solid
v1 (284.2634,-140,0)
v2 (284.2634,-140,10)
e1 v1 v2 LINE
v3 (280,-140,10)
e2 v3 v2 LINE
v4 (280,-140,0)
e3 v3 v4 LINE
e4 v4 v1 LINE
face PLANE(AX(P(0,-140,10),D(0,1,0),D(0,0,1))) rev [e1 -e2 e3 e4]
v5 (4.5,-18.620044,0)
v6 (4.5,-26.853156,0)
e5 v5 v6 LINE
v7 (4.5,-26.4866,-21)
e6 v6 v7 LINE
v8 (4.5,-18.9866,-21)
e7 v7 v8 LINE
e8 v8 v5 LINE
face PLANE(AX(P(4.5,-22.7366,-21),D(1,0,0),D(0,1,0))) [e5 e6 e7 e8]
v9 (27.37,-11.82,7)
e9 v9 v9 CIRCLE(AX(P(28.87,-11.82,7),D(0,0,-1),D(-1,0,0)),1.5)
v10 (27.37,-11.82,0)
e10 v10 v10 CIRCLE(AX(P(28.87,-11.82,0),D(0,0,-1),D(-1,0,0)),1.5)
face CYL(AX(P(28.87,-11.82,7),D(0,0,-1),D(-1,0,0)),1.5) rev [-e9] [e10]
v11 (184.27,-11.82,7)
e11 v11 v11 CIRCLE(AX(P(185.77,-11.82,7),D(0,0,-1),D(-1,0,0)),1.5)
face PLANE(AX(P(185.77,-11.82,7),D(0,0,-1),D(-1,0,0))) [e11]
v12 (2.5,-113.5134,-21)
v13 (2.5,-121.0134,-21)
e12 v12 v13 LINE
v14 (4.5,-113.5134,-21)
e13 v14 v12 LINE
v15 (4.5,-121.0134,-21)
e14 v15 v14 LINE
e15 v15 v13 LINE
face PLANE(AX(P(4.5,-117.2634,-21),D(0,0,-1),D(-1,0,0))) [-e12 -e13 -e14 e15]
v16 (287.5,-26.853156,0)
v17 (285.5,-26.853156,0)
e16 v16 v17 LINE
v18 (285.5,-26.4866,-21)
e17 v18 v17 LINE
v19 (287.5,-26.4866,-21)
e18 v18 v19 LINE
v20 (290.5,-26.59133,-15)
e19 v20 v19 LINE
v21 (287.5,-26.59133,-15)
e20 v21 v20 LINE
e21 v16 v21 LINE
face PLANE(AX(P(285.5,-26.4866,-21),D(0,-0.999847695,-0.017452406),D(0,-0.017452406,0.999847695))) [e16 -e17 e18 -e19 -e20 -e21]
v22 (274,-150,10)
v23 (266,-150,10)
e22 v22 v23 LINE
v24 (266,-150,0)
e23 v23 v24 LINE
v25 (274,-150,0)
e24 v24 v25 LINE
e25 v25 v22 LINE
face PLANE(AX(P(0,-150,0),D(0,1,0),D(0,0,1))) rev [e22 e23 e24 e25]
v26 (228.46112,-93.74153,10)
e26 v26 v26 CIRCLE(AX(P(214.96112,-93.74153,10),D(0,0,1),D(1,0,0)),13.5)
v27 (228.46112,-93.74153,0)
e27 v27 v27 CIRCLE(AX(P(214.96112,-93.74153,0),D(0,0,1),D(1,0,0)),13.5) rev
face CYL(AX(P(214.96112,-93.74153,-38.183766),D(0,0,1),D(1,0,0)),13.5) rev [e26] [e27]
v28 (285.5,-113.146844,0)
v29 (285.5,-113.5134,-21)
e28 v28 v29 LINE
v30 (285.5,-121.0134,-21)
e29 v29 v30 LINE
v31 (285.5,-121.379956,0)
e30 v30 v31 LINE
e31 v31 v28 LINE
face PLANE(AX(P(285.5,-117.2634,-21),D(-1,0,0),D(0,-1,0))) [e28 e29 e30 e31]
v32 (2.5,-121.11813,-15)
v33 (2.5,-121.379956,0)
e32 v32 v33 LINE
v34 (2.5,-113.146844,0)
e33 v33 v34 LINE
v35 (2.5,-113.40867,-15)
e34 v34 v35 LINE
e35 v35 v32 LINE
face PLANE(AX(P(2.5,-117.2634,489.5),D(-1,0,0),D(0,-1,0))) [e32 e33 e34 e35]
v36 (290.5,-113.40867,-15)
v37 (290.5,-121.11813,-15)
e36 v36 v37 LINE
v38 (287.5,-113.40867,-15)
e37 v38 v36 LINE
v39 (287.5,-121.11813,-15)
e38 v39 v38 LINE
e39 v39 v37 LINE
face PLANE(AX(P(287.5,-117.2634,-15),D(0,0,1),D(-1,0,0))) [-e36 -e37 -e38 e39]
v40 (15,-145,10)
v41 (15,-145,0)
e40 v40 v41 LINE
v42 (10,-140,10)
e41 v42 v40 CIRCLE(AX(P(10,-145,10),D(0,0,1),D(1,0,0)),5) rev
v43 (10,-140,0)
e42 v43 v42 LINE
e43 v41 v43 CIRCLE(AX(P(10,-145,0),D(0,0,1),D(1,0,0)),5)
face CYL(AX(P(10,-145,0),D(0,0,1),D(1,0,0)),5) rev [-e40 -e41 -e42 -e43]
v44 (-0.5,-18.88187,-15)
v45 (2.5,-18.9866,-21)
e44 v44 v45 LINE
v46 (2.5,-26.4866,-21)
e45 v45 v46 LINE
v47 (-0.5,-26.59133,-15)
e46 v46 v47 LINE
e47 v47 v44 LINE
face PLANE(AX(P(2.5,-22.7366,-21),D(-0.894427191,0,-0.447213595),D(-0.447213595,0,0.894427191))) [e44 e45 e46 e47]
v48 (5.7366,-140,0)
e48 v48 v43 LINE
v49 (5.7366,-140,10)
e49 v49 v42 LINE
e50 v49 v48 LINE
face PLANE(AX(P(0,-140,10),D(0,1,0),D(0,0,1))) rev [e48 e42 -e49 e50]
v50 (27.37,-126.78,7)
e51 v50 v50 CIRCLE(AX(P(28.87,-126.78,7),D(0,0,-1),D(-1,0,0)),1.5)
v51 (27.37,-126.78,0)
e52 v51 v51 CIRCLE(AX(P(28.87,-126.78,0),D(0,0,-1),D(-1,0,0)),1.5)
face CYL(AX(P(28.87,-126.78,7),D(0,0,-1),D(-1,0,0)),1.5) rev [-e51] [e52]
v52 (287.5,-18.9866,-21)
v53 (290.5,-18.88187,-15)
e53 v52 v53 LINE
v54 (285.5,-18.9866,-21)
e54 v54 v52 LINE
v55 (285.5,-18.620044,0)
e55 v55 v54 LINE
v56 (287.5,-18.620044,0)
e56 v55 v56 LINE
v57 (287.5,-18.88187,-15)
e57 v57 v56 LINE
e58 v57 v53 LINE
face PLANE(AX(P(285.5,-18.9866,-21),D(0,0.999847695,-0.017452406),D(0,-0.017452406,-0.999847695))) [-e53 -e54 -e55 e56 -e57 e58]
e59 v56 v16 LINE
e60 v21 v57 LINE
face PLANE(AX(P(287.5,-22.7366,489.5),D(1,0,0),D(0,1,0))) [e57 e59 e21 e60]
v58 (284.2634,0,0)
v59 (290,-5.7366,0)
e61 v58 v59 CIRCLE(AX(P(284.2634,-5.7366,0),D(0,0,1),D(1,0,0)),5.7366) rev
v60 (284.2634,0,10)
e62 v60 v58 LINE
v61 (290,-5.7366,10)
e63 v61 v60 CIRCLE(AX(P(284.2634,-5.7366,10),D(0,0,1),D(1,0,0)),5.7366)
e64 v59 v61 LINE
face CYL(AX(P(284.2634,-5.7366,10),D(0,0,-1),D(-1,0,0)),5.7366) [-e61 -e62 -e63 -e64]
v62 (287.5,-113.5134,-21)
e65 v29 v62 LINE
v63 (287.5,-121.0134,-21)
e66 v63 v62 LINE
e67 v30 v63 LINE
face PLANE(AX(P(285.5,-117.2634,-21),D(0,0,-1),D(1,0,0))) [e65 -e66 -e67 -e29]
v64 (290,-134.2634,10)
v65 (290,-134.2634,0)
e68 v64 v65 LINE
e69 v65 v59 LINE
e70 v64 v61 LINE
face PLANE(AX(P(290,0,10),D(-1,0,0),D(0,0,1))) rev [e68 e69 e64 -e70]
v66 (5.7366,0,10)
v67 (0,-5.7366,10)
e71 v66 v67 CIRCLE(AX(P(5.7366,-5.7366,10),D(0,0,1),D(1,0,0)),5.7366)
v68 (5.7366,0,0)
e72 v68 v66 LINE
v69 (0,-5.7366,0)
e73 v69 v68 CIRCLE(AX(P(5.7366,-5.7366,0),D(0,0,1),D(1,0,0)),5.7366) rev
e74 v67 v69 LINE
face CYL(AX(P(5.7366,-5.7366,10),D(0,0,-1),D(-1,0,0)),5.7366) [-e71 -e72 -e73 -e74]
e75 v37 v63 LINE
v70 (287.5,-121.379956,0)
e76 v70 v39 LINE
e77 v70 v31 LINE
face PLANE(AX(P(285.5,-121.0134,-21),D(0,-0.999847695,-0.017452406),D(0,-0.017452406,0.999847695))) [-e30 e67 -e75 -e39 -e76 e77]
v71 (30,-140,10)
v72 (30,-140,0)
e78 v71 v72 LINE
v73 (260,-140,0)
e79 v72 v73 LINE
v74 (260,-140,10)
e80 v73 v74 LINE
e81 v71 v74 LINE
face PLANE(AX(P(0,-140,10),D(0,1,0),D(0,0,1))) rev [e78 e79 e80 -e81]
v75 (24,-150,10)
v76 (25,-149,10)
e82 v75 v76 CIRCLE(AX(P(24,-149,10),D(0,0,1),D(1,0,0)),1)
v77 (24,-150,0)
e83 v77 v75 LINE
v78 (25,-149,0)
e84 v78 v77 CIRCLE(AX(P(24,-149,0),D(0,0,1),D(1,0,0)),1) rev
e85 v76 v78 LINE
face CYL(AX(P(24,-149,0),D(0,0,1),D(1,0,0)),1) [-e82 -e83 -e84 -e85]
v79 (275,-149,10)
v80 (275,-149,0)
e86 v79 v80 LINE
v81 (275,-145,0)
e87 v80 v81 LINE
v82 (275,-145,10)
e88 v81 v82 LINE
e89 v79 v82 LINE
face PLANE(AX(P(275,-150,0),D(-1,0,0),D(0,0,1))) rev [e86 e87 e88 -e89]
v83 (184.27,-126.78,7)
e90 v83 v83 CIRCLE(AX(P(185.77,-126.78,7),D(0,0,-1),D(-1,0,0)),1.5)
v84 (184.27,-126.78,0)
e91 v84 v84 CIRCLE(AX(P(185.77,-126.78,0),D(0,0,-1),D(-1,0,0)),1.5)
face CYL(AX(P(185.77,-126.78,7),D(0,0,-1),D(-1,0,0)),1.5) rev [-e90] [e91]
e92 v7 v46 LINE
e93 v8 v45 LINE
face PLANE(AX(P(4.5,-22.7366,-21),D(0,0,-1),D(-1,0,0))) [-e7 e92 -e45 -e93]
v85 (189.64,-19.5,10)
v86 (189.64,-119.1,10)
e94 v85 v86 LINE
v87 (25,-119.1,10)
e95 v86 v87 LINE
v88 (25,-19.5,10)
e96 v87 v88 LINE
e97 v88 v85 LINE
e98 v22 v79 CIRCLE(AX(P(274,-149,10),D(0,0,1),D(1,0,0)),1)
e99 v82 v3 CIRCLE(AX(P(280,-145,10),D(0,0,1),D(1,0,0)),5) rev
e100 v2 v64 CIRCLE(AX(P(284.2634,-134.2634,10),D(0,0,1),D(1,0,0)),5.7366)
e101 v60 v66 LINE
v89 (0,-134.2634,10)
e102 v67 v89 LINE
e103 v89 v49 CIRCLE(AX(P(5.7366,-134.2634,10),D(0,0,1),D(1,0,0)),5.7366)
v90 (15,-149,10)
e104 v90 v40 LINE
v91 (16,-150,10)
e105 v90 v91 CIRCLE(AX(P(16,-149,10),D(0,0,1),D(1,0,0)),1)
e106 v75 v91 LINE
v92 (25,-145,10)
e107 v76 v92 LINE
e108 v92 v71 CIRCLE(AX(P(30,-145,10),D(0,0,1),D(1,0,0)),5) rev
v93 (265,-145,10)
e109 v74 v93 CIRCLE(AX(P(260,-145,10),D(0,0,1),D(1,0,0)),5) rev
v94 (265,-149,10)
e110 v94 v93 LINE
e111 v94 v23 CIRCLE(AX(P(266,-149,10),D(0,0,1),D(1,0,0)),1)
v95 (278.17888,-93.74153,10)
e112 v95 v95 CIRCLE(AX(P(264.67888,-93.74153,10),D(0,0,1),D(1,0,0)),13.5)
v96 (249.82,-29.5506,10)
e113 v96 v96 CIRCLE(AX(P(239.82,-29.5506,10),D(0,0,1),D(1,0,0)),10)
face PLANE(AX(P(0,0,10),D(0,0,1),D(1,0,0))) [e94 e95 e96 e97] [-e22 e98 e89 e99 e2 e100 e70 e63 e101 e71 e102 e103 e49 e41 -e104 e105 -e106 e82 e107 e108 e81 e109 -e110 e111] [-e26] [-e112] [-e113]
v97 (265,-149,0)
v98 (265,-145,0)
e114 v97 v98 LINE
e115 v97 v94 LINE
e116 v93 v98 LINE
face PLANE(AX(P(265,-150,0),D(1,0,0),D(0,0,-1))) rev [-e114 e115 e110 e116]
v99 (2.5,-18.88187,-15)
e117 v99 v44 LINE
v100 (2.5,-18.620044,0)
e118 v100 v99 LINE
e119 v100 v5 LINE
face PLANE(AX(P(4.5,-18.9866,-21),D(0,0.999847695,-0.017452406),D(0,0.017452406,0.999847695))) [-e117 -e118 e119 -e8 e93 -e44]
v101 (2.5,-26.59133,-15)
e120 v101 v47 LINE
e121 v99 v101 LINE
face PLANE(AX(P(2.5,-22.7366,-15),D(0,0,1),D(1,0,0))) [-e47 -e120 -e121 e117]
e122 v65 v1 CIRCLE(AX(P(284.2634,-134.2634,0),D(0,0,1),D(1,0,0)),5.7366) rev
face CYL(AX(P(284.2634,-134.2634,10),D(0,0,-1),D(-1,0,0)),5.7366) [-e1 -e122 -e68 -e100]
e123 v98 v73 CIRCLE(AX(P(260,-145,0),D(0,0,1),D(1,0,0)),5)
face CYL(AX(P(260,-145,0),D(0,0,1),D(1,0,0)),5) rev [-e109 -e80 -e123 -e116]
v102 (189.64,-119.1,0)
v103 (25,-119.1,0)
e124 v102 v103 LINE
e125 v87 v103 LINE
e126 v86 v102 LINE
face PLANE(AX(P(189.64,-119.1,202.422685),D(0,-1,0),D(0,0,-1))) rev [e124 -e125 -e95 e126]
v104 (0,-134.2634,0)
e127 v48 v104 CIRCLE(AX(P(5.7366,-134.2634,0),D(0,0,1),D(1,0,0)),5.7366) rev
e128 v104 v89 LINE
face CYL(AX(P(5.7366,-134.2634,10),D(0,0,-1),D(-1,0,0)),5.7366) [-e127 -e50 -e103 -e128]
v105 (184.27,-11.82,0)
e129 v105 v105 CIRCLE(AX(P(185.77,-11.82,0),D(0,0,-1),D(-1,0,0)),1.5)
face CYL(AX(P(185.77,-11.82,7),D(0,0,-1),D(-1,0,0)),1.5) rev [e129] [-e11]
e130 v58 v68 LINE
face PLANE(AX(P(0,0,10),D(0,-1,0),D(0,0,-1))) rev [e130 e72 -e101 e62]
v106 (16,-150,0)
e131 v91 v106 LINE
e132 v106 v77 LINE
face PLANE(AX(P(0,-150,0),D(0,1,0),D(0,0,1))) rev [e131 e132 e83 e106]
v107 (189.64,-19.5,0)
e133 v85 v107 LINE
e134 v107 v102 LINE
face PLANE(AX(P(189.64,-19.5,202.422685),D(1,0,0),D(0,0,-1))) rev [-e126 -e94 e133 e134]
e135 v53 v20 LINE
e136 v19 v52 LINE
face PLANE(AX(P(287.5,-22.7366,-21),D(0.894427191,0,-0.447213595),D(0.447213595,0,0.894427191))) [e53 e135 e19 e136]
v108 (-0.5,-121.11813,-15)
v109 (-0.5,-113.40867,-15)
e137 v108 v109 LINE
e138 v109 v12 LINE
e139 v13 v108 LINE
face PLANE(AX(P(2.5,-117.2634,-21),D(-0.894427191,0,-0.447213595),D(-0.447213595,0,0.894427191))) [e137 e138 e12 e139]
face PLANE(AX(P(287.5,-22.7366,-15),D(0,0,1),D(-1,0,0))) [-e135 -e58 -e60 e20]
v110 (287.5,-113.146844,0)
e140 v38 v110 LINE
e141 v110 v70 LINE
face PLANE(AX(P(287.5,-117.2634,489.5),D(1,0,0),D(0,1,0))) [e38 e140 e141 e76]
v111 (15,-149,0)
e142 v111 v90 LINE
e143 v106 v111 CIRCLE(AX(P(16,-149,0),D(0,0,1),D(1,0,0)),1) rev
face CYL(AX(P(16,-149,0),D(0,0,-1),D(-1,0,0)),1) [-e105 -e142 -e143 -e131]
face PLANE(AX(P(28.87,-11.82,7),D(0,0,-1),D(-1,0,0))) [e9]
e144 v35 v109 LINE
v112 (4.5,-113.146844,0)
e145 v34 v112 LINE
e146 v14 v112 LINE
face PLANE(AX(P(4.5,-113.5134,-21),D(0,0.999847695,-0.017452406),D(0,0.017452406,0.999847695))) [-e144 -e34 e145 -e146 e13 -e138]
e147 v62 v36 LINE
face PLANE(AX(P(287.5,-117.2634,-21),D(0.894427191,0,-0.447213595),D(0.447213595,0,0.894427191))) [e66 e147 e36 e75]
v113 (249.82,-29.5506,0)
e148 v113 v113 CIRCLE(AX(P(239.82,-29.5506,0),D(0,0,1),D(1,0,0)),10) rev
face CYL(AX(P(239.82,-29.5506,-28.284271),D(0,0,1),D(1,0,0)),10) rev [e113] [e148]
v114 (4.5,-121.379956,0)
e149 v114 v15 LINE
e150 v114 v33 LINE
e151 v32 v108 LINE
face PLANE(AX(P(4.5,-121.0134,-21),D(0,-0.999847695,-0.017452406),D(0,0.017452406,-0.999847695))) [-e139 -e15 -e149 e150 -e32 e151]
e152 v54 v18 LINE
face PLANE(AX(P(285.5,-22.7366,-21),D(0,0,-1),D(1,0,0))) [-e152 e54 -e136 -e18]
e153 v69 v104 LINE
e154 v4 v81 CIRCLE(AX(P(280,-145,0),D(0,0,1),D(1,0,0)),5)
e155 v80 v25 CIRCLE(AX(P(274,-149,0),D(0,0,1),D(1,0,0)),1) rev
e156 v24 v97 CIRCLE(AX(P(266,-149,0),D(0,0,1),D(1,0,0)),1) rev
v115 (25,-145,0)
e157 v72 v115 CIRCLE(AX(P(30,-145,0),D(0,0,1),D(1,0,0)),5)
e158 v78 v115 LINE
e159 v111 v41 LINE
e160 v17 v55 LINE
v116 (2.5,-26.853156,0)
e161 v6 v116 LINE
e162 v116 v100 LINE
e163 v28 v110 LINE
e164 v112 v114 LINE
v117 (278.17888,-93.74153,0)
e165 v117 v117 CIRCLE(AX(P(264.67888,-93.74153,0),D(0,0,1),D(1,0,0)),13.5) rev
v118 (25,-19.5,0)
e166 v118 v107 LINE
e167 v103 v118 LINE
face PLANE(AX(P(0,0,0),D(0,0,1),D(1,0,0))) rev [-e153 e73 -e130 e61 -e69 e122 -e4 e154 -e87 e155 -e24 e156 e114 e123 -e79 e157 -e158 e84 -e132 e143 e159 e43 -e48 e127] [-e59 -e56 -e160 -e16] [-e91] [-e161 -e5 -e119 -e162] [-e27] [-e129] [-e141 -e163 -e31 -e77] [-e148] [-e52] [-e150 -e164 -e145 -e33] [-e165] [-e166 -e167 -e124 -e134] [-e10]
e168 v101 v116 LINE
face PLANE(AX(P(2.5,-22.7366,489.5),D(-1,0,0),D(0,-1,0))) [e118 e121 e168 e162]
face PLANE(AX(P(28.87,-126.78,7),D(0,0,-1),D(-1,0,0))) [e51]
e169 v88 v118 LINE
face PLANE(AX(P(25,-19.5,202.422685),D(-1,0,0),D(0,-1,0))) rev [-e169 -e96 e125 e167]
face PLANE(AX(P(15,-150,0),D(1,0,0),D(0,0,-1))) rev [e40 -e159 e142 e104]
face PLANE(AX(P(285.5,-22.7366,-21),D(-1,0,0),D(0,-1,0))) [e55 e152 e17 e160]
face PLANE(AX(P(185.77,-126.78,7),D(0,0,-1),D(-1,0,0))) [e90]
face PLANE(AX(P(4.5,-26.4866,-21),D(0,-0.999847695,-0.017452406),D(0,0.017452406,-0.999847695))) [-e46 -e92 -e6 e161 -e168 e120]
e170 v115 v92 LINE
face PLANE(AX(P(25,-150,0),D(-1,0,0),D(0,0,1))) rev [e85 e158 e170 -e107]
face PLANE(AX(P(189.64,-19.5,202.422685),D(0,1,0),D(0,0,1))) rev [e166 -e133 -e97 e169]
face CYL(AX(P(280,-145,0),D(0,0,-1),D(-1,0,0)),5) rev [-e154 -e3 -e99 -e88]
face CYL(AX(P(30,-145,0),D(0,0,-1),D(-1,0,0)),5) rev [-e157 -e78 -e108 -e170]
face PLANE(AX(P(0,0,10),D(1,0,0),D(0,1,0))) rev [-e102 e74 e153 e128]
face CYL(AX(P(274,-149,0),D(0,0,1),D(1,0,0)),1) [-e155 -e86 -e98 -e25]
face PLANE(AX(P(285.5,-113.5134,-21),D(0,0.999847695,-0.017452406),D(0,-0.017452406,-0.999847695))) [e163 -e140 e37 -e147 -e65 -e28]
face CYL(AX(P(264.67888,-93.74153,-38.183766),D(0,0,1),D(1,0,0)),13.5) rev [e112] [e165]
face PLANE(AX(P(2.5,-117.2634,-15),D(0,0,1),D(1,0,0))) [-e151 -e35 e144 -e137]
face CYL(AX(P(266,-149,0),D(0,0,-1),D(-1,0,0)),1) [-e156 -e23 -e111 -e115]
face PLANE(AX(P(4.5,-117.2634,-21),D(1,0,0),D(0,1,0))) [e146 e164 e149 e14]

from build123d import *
from OCP.BRepFilletAPI import BRepFilletAPI_MakeFillet

# Parameters (mm, degrees)
SKETCH1_W            = 290
SKETCH1_H            = 140
MAIN_BODY_DEPTH      = 10
SKETCH2_W            = 164.64
SKETCH2_H            = 99.6
DISPLAY_DEPTH        = 10
SKETCH5_W            = 10
SKETCH5_H            = 10
FEET_DEPTH           = 10
FEET_FILLETS_R1      = 5
FEET_FILLETS_R2      = 1
SKETCH8_R            = 10
ROTARY_ENCODER_DEPTH = 10
SKETCH9_R            = 13.5
CONNECTORS_DEPTH     = 10
SNAP_START           = 285.5
SNAP_HOOK1_DEPTH     = 2
SNAP_START_2         = -26.59133039
SNAP_HOOK1_2_DEPTH   = 7.70946078
SNAP_START_3         = 287.5
SNAP_HOOK1_3_DEPTH   = 3.5
SNAP_HOOK2_DEPTH     = 2
SNAP_START_4         = -121.11813039
SNAP_HOOK2_2_DEPTH   = 7.70946078
SNAP_HOOK2_3_DEPTH   = 3.5
SNAP_START_5         = 2.5
SNAP_HOOK3_DEPTH     = 2
SNAP_HOOK3_2_DEPTH   = 7.70946078
SNAP_START_6         = -1
SNAP_HOOK3_3_DEPTH   = 3.5
SNAP_HOOK4_DEPTH     = 2
SNAP_HOOK4_2_DEPTH   = 7.70946078
SNAP_HOOK4_3_DEPTH   = 3.5
SIDE_FILLETS_R       = 5.7366
SKETCH11_R           = 1.5
DISPLAY_HOLES_DEPTH  = 7


with BuildPart() as part:
    # Sketch1 → Main Body (new body)
    with BuildSketch(Plane.XY):
        with Locations((145, -70)):
            Rectangle(SKETCH1_W, SKETCH1_H)
    extrude(amount=MAIN_BODY_DEPTH)

    # Sketch2 → Display (cut)
    with BuildSketch(Plane(origin=(0, 0, 0), x_dir=(-1, 0, 0), z_dir=(0, 0, -1))):
        with Locations((-107.32, -69.3)):
            Rectangle(SKETCH2_W, SKETCH2_H)
    extrude(amount=-DISPLAY_DEPTH, mode=Mode.SUBTRACT)

    # Sketch5 → Feet (add)
    with BuildSketch(Plane.XZ.offset(140)):
        with Locations((20, 5)):
            Rectangle(SKETCH5_W, SKETCH5_H)
        with Locations((270, 5)):
            Rectangle(SKETCH5_W, SKETCH5_H)
    extrude(amount=FEET_DEPTH)

    # Feet Fillets: one fillet with a radius per group of edges: ONE call of the kernel's fillet builder (fillet() takes one radius for all edges)
    feet_fillets_edges_1 = [part.edges().sort_by_distance(p)[0] for p in [
        (15, -140, 5),
        (25, -140, 5),
        (275, -140, 5),
        (265, -140, 5),
    ]]
    feet_fillets_edges_2 = [part.edges().sort_by_distance(p)[0] for p in [
        (265, -150, 5),
        (275, -150, 5),
        (25, -150, 5),
        (15, -150, 5),
    ]]
    feet_fillets = BRepFilletAPI_MakeFillet(part.part.solid().wrapped)
    for e in feet_fillets_edges_1:
        feet_fillets.Add(FEET_FILLETS_R1, e.wrapped)
    for e in feet_fillets_edges_2:
        feet_fillets.Add(FEET_FILLETS_R2, e.wrapped)
    add(Compound.cast(feet_fillets.Shape()), mode=Mode.REPLACE)

    # Sketch8 → Rotary Encoder (cut)
    with BuildSketch(Plane.XY.offset(10)):
        with Locations((239.82, -29.550599566)):
            Circle(SKETCH8_R)
    extrude(amount=-ROTARY_ENCODER_DEPTH, mode=Mode.SUBTRACT)

    # Sketch9 → Connectors (cut)
    with BuildSketch(Plane.XY.offset(10)):
        with Locations((214.961120299, -93.741529743)):
            Circle(SKETCH9_R)
        with Locations((264.678879701, -93.741529743)):
            Circle(SKETCH9_R)
    extrude(amount=-CONNECTORS_DEPTH, mode=Mode.SUBTRACT)

    # Snap Hook1: read off the stored shape, not the designer's step
    # Snap Hook1 outline → Snap Hook1 (add)
    with BuildSketch(Plane.YZ.offset(SNAP_START)):
        Polygon((-26.4866, -21), (-18.9866, -21), (-18.620043637, 0), (-26.853156363, 0), align=None)
    extrude(amount=SNAP_HOOK1_DEPTH)

    # Snap Hook1 2 outline → Snap Hook1 2 (add)
    with BuildSketch(Plane(origin=(0, 0, 0), x_dir=(1, 0, 0), z_dir=(0, 1, 0)).offset(SNAP_START_2)):
        Polygon((287.5, 15), (290.5, 15), (287.5, 21), align=None)
    extrude(amount=SNAP_HOOK1_2_DEPTH)

    # Snap Hook1 3 outline → Snap Hook1 3 (cut)
    with BuildSketch(Plane.YZ.offset(SNAP_START_3)):
        Polygon((-18.881869611, -15), (-18.9866, -21), (-19.004055065, -22), (-18.88186961, -22), align=None)
        Polygon((-26.59133039, -22), (-26.469144935, -22), (-26.4866, -21), (-26.591330389, -15), align=None)
    extrude(amount=SNAP_HOOK1_3_DEPTH, mode=Mode.SUBTRACT)

    # Snap Hook2: read off the stored shape, not the designer's step
    # Snap Hook2 outline → Snap Hook2 (add)
    with BuildSketch(Plane.YZ.offset(SNAP_START)):
        Polygon((-121.0134, -21), (-113.5134, -21), (-113.146843637, 0), (-121.379956363, 0), align=None)
    extrude(amount=SNAP_HOOK2_DEPTH)

    # Snap Hook2 2 outline → Snap Hook2 2 (add)
    with BuildSketch(Plane(origin=(0, 0, 0), x_dir=(1, 0, 0), z_dir=(0, 1, 0)).offset(SNAP_START_4)):
        Polygon((287.5, 15), (290.5, 15), (287.5, 21), align=None)
    extrude(amount=SNAP_HOOK2_2_DEPTH)

    # Snap Hook2 3 outline → Snap Hook2 3 (cut)
    with BuildSketch(Plane.YZ.offset(SNAP_START_3)):
        Polygon((-113.408669611, -15), (-113.5134, -21), (-113.530855065, -22), (-113.40866961, -22), align=None)
        Polygon((-121.11813039, -22), (-120.995944935, -22), (-121.0134, -21), (-121.118130389, -15), align=None)
    extrude(amount=SNAP_HOOK2_3_DEPTH, mode=Mode.SUBTRACT)

    # Snap Hook3: read off the stored shape, not the designer's step
    # Snap Hook3 outline → Snap Hook3 (add)
    with BuildSketch(Plane.YZ.offset(SNAP_START_5)):
        Polygon((-26.4866, -21), (-18.9866, -21), (-18.620043637, 0), (-26.853156363, 0), align=None)
    extrude(amount=SNAP_HOOK3_DEPTH)

    # Snap Hook3 2 outline → Snap Hook3 2 (add)
    with BuildSketch(Plane(origin=(0, 0, 0), x_dir=(1, 0, 0), z_dir=(0, 1, 0)).offset(SNAP_START_2)):
        Polygon((2.5, 21), (-0.5, 15), (2.5, 15), align=None)
    extrude(amount=SNAP_HOOK3_2_DEPTH)

    # Snap Hook3 3 outline → Snap Hook3 3 (cut)
    with BuildSketch(Plane.YZ.offset(SNAP_START_6)):
        Polygon((-18.881869611, -15), (-18.9866, -21), (-19.004055065, -22), (-18.88186961, -22), align=None)
        Polygon((-26.59133039, -22), (-26.469144935, -22), (-26.4866, -21), (-26.591330389, -15), align=None)
    extrude(amount=SNAP_HOOK3_3_DEPTH, mode=Mode.SUBTRACT)

    # Snap Hook4: read off the stored shape, not the designer's step
    # Snap Hook4 outline → Snap Hook4 (add)
    with BuildSketch(Plane.YZ.offset(SNAP_START_5)):
        Polygon((-121.0134, -21), (-113.5134, -21), (-113.146843637, 0), (-121.379956363, 0), align=None)
    extrude(amount=SNAP_HOOK4_DEPTH)

    # Snap Hook4 2 outline → Snap Hook4 2 (add)
    with BuildSketch(Plane(origin=(0, 0, 0), x_dir=(1, 0, 0), z_dir=(0, 1, 0)).offset(SNAP_START_4)):
        Polygon((2.5, 21), (-0.5, 15), (2.5, 15), align=None)
    extrude(amount=SNAP_HOOK4_2_DEPTH)

    # Snap Hook4 3 outline → Snap Hook4 3 (cut)
    with BuildSketch(Plane.YZ.offset(SNAP_START_6)):
        Polygon((-113.408669611, -15), (-113.5134, -21), (-113.530855065, -22), (-113.40866961, -22), align=None)
        Polygon((-121.11813039, -22), (-120.995944935, -22), (-121.0134, -21), (-121.118130389, -15), align=None)
    extrude(amount=SNAP_HOOK4_3_DEPTH, mode=Mode.SUBTRACT)

    # Side Fillets
    side_fillets_edges = [part.edges().sort_by_distance(p)[0] for p in [
        (0, 0, 5),
        (290, 0, 5),
        (290, -140, 5),
        (0, -140, 5),
    ]]
    fillet(side_fillets_edges, radius=SIDE_FILLETS_R)

    # Sketch11 → Display Holes (cut)
    with BuildSketch(Plane(origin=(0, 0, 0), x_dir=(-1, 0, 0), z_dir=(0, 0, -1))):
        with Locations((-185.77, -11.82)):
            Circle(SKETCH11_R)
        with Locations((-28.87, -11.82)):
            Circle(SKETCH11_R)
        with Locations((-185.77, -126.78)):
            Circle(SKETCH11_R)
        with Locations((-28.87, -126.78)):
            Circle(SKETCH11_R)
    extrude(amount=-DISPLAY_HOLES_DEPTH, mode=Mode.SUBTRACT)


solid = part.part
